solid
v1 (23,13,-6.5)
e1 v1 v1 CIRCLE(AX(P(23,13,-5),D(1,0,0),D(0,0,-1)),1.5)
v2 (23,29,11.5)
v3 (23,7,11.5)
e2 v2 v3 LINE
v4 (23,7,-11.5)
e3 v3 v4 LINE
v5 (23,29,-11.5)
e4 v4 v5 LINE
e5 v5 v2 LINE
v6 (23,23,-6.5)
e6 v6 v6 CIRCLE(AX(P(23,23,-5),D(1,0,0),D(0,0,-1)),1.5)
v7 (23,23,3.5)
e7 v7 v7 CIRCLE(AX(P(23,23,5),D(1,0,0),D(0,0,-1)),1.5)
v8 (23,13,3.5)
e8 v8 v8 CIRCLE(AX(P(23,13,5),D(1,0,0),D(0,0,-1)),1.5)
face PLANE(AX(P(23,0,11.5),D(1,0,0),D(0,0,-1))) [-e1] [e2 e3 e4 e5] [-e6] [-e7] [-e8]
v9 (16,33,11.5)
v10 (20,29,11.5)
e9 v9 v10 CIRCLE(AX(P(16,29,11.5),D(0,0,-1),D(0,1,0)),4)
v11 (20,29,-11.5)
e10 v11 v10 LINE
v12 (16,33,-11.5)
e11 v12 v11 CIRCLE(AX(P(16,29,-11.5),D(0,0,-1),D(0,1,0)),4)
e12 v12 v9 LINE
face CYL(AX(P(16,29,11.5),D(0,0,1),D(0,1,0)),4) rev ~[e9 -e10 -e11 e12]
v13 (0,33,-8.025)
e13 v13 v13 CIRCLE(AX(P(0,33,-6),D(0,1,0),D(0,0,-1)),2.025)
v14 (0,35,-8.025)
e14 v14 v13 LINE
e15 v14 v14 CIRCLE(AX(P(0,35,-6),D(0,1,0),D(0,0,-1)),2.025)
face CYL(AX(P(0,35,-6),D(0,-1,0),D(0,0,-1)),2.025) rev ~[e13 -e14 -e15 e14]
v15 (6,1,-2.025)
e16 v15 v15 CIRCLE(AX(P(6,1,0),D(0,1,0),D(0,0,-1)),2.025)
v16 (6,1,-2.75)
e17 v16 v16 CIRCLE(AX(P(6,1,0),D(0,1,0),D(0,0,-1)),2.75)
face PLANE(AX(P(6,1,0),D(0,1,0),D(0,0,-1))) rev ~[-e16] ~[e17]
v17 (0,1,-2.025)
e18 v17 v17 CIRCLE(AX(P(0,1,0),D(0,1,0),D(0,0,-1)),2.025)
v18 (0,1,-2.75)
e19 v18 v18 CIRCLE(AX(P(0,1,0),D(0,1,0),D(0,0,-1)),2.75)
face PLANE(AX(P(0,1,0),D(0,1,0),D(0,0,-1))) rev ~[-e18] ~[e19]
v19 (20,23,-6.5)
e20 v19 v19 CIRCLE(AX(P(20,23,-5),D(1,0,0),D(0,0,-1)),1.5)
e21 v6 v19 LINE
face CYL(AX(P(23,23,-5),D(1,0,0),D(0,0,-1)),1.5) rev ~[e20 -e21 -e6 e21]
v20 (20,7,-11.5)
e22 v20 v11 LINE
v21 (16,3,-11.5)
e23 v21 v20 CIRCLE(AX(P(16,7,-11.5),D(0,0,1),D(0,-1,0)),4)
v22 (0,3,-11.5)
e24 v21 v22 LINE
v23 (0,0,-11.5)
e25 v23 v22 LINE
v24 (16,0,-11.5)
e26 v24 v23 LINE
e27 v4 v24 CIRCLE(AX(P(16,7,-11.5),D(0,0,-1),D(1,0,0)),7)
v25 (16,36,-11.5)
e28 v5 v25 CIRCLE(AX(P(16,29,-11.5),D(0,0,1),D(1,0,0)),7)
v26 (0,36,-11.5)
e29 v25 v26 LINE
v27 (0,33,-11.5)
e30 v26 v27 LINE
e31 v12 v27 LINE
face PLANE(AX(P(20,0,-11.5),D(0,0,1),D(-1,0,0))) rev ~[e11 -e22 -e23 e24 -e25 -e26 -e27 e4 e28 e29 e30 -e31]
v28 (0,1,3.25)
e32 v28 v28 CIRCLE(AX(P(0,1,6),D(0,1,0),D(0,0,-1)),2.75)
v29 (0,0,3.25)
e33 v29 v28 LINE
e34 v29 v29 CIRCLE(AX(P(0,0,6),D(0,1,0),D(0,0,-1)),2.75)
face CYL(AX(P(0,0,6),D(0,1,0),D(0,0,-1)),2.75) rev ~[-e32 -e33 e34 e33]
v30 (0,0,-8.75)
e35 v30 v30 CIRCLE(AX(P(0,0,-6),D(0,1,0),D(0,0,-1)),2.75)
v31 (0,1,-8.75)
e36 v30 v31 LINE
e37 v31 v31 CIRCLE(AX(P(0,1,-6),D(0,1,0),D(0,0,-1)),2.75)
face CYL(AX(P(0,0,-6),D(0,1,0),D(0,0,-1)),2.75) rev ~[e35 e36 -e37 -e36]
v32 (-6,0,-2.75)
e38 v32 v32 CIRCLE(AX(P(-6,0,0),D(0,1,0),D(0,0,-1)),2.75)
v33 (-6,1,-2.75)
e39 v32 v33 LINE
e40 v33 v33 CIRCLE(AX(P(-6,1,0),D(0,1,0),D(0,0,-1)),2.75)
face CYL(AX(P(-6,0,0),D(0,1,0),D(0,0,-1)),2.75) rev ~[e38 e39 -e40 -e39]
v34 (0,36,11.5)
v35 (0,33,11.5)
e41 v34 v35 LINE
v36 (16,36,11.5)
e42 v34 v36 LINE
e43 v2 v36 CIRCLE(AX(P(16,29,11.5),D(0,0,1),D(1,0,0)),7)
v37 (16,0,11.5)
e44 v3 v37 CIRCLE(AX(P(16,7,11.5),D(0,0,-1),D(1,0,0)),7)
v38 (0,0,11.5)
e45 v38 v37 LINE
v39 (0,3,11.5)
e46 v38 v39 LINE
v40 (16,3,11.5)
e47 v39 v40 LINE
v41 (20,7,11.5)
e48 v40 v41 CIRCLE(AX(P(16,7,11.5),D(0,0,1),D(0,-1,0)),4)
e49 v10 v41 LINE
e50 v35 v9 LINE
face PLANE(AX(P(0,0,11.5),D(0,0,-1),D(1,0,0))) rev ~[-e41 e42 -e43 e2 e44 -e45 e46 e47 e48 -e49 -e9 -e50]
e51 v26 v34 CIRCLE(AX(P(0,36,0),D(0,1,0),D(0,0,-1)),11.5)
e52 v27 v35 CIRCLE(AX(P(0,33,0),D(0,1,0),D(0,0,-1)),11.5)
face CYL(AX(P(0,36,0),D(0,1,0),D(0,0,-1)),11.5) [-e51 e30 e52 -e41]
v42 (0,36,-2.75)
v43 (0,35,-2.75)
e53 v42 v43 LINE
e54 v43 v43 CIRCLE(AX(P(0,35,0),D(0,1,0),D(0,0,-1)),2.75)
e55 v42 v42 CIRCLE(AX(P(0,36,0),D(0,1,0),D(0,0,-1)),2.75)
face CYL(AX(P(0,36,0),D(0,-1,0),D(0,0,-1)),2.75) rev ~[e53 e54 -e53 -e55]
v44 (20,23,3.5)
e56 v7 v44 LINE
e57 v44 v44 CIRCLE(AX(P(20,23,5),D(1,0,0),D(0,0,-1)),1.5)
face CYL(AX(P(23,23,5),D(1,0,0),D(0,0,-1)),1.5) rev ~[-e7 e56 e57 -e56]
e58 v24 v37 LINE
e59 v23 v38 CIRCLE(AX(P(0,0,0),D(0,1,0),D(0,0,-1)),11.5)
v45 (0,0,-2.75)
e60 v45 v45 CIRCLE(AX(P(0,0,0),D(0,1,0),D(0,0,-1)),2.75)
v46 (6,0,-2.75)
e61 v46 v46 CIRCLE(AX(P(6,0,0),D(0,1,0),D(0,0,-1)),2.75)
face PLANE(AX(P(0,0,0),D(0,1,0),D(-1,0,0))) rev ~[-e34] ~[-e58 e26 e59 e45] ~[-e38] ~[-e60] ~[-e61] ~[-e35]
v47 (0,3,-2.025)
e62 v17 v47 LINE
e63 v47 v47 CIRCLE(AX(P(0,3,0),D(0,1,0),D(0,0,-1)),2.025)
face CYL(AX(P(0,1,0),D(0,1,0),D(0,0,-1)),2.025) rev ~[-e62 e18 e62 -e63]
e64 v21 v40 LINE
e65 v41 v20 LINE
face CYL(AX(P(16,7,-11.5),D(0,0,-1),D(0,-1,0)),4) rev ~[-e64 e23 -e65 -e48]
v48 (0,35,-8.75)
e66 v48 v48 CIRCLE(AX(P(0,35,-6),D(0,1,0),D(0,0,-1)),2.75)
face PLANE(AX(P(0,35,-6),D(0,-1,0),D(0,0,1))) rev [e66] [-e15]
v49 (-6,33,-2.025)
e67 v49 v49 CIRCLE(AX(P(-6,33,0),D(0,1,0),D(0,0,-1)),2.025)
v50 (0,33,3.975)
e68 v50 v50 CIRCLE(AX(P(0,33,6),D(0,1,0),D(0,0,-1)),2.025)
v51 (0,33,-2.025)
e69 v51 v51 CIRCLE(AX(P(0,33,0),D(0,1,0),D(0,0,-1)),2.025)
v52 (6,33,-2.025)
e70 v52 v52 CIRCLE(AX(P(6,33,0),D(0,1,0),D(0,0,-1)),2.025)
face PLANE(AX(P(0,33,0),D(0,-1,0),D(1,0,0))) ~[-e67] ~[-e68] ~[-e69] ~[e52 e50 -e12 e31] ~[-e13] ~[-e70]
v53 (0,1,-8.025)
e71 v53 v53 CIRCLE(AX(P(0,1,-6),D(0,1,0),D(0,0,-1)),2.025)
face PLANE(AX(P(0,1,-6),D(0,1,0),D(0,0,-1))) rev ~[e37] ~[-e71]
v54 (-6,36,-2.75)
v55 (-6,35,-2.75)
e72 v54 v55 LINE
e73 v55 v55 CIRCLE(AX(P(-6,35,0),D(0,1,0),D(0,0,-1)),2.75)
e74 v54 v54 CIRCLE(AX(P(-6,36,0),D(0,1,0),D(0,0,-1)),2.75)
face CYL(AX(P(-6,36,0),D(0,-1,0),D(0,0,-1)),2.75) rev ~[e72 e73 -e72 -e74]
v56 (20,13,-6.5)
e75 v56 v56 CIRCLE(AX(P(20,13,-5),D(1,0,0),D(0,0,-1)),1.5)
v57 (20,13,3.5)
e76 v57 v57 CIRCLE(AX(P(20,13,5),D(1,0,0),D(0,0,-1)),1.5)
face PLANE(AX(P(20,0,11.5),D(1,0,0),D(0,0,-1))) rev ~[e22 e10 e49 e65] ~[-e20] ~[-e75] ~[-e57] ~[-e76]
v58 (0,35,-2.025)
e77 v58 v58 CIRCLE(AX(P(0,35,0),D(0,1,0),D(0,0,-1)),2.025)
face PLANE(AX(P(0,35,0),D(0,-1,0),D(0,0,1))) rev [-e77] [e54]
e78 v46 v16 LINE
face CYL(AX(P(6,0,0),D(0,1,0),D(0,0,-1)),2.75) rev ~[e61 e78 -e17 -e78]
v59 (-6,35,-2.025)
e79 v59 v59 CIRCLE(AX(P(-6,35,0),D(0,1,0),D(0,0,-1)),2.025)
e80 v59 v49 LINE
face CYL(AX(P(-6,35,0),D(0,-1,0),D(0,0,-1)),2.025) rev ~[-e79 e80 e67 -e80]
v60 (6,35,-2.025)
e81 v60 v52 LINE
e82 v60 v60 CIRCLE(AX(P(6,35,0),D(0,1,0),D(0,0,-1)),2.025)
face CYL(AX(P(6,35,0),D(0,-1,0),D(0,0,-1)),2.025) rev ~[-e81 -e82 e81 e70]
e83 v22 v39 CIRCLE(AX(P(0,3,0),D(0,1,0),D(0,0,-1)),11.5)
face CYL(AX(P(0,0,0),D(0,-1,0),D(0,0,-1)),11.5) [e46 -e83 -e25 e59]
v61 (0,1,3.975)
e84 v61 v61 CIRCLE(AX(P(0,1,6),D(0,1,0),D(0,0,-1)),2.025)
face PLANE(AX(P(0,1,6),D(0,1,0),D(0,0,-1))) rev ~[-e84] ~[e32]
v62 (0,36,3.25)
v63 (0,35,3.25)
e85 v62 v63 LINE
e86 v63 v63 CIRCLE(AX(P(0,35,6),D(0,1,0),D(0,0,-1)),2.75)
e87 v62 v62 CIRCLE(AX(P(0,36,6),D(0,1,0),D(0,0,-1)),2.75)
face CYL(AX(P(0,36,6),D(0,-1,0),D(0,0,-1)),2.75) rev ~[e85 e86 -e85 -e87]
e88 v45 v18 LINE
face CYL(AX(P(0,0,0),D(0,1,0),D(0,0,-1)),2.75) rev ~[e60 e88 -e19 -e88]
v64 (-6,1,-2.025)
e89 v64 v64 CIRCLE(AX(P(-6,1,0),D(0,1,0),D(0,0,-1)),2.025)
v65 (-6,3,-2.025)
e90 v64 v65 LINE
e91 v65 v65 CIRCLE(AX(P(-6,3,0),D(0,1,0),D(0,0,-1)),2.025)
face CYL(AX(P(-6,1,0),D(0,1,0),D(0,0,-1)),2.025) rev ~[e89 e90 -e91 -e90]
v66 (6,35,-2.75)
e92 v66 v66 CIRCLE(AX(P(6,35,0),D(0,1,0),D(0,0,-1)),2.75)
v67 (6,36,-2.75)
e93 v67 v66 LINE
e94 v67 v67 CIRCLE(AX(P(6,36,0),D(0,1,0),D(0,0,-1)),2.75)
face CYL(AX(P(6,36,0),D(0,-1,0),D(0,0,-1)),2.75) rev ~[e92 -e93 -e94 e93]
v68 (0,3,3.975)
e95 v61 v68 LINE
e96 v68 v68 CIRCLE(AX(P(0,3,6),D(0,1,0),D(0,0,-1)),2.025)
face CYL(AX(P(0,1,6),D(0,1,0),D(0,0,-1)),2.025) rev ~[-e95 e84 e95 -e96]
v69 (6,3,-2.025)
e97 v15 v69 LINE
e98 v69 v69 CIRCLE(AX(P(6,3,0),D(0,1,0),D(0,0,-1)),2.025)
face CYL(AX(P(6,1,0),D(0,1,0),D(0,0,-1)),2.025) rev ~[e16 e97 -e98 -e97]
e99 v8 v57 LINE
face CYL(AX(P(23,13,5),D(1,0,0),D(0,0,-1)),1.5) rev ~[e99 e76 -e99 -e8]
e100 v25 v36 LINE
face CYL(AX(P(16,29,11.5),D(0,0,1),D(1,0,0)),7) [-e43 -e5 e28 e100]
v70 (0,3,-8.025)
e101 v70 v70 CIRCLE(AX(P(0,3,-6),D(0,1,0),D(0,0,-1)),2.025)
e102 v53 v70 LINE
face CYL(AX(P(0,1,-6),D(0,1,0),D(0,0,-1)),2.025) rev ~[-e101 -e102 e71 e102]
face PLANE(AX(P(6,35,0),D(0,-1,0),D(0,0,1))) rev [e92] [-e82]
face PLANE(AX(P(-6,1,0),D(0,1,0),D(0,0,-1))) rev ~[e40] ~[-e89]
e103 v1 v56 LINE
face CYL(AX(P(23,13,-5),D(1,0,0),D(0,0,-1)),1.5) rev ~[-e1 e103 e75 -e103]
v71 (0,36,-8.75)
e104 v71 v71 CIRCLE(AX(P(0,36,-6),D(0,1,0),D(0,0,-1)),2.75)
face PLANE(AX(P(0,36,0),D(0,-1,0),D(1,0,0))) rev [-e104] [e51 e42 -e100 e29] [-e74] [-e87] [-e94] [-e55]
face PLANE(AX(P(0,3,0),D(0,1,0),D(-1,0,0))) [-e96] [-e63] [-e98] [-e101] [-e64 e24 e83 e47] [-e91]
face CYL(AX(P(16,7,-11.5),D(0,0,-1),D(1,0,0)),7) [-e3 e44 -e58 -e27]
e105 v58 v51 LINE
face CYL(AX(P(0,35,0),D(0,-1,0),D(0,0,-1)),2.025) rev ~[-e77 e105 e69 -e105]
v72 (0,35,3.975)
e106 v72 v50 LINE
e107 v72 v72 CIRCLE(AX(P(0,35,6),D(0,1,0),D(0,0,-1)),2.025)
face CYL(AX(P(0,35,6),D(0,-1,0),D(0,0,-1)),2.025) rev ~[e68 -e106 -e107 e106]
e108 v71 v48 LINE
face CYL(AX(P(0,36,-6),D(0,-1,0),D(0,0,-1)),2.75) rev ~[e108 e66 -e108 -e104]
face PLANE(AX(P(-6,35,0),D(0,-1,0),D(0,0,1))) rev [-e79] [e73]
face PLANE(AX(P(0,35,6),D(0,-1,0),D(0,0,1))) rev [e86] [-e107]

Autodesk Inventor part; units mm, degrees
ref_plane "YZ Plane" through (0, 0, 0) normal (1, 0, 0) x (0, 1, 0)
ref_plane "XZ Plane" through (0, 0, 0) normal (0, 1, 0) x (-1, 0, 0)
ref_plane "XY Plane" through (0, 0, 0) normal (0, 0, 1) x (1, 0, 0)
sketch "Esquisse6" plane through (20, 29, 11.5) normal (-1, 0, 0) x (0, 0, 1)
  line L0 (0, -22) -> (-23, -22) construction
  line L1 (-23, -30.3566) -> (-23, -22) construction
  line L2 (0, -30.3566) -> (-23, -30.3566) construction
  line L3 (0, -30.3566) -> (0, -22) construction
  line L4 (-23, 0) -> (0, 0) construction
  line L5 (0, 8.3566) -> (0, 0) construction
  line L6 (-23, 8.3566) -> (0, 8.3566) construction
  line L7 (-23, 8.3566) -> (-23, 0) construction
  line L8 (-23, 8.3566) -> (-23, 0) construction
  line L9 (0, 8.3566) -> (-23, 8.3566) construction
  line L10 (0, 8.3566) -> (0, 0) construction
  line L11 (0, 8.3566) -> (0, 0) construction
  line L12 (-23, -30.3566) -> (-22, -27.6783)
  line L13 (-22, -27.6783) -> (-21, -27.6783)
  line L14 (-21, -27.6783) -> (-21, -24.6783)
  line L15 (-21, -24.6783) -> (-22, -24.6783)
  line L16 (-22, -24.6783) -> (-23, -22)
  line L17 (-23, -30.3566) -> (-23, -22) construction
  line L18 (-23, -26.1783) -> (-21, -26.1783) construction
  line L19 (-23, -22) -> (-23, -30.3566)
  line L20 (-23, -30.3566) -> (0, -30.3566) projected
  line L21 (-11.5, -22) -> (-11.5, -30.3566) construction
  line L22 (-23, -22) -> (0, -22) construction
  line L23 (0, -30.3566) -> (0, -22) construction
  line L24 (-23, -30.3566) -> (0, -30.3566) construction
  line L25 (0, -30.3566) -> (-1, -27.6783)
  line L26 (-1, -27.6783) -> (-2, -27.6783)
  line L27 (-2, -27.6783) -> (-2, -24.6783)
  line L28 (-2, -24.6783) -> (-1, -24.6783)
  line L29 (-1, -24.6783) -> (0, -22)
  line L30 (0, -30.3566) -> (0, -22) construction
  line L31 (0, -26.1783) -> (-2, -26.1783) construction
  line L32 (0, -22) -> (0, -30.3566)
  line L33 (0, -30.3566) -> (-23, -30.3566)
  dimension "d31" = 1
  dimension "d32" = 1
  dimension "d33" = 3
sketch "Esquisse1" plane through (0, 0, 0) normal (0, 1, 0) x (-1, 0, 0)
  arc A0 (0, -11.5) -> (0, 11.5) centre (0, 0) ccw
  line L0 (0, 11.5) -> (-20, 11.5)
  line L1 (-20, 11.5) -> (-20, -11.5)
  line L2 (-20, -11.5) -> (0, -11.5)
  dimension "d0" = 23
  dimension "d1" = 20
  dimension "d2" = 11.5
extrude "Plaque1" add sketch "Esquisse1" along normal blind 3
sketch "Esquisse2" plane through (0, 0, 0) normal (0, -1, 0) x (1, 0, 0)
  arc A0 (0, 11.5) -> (0, -11.5) centre (0, 0) ccw construction
  line L0 (0, 0) -> (-6, 0) construction
  point P0 (0, 6)
  point P1 (0, -6)
  point P2 (6, 0)
  dimension "d6" = 360
  dimension "d8" = 6
hole "Perçage1" at (0, 0, 0) at (0, 0, 6) at (-6, 0, 0) at (0, 0, -6) at (6, 0, 0) direction (0, 1, 0) diameter 4.05 end through all counterbore diameter 5.5 counterbore depth 1
ref_plane "Plan de construction1" through (0, 18, 0) normal (0, 1, 0) x (1, 0, 0)
mirror "Symétrie1" about plane through (0, 18, 0) normal (0, 1, 0)
sketch "Esquisse3" plane through (20, 0, 11.5) normal (1, 0, 0) x (0, 0, -1)
  line L0 (23, 3) -> (0, 3)
  line L1 (0, 0) -> (0, 3)
  line L2 (23, 0) -> (0, 0)
  line L3 (23, 0) -> (23, 3)
  line L4 (23, 33) -> (0, 33)
  line L5 (23, 36) -> (23, 33)
  line L6 (23, 36) -> (0, 36)
  line L7 (0, 36) -> (0, 33)
  line L8 (0, 0) -> (23, 0)
  line L9 (23, 0) -> (23, 36)
  line L10 (23, 36) -> (0, 36)
  line L11 (0, 36) -> (0, 0)
  point P0 (11.5, 0)
sheet face with bend "Face2" sketch "Esquisse3" thickness 3 toward (1, 0, 0) bend radius 4 contours L0 L11 L4 L9
bend "Pli1"
sketch "Esquisse4" plane through (23, 0, 11.5) normal (1, 0, 0) x (0, 0, -1)
  line L0 (23, 7) -> (0, 7) construction
  line L1 (23, 29) -> (23, 7) construction
  line L2 (0, 29) -> (23, 29) construction
  line L3 (0, 7) -> (0, 29) construction
  line L4 (23, 18) -> (0, 18) construction
  circle A0 centre (16.5, 23) radius 1.5
  line L5 (11.5, 18) -> (11.5, 7) construction
  circle A1 centre (16.5, 13) radius 1.5
  circle A2 centre (6.5, 23) radius 1.5
  circle A3 centre (6.5, 13) radius 1.5
  point P0 (11.5, 0)
  dimension "d22" = 10
  dimension "d23" = 3
  dimension "d25" = 10
extrude "Couper1" cut sketch "Esquisse4" against normal blind 3
equation "\"d8\" = ollo_spacing"
equation "\"d2\" = 0.5 * d0"
equation "\"d9\" = ollo_hole"
equation "\"d11\" = ollo_ring"
equation "\"d12\" = ollo_depth"
equation "\"d14\" = Epaisseur"
equation "\"d25\" = d22"
equation "\"d26\" = Epaisseur"
equation "\"d17\" = RayonPli"
equation "\"d18\" = LargeurGrugeage"
equation "\"d20\" = RestesMinimum"
equation "\"d19\" = ProfondeurGrugeage"
equation "\"d21\" = RayonPli"
equation "\"LargeurGrugeage\" = Epaisseur"
equation "\"ProfondeurGrugeage\" = 0.5 * Epaisseur"
equation "\"TailleGrugeage\" = 4 * Epaisseur"
equation "\"RestesMinimum\" = 2 * Epaisseur"
equation "\"Rayondetransition\" = RayonPli"
equation "\"TailleRayonJacobi\" = RayonPli"
equation "\"TailleJeu\" = Epaisseur"
equation "\"d3\" = RayonPli"
equation "\"ollo_hole\" = 4.05"
equation "\"ollo_ring\" = 5.5"
equation "\"ollo_depth\" = 1"
equation "\"Epaisseur\" = 3"
equation "\"RayonPli\" = 4"
equation "\"ollo_spacing\" = 6"
properties part number "u" material "Plastique PMMA"
